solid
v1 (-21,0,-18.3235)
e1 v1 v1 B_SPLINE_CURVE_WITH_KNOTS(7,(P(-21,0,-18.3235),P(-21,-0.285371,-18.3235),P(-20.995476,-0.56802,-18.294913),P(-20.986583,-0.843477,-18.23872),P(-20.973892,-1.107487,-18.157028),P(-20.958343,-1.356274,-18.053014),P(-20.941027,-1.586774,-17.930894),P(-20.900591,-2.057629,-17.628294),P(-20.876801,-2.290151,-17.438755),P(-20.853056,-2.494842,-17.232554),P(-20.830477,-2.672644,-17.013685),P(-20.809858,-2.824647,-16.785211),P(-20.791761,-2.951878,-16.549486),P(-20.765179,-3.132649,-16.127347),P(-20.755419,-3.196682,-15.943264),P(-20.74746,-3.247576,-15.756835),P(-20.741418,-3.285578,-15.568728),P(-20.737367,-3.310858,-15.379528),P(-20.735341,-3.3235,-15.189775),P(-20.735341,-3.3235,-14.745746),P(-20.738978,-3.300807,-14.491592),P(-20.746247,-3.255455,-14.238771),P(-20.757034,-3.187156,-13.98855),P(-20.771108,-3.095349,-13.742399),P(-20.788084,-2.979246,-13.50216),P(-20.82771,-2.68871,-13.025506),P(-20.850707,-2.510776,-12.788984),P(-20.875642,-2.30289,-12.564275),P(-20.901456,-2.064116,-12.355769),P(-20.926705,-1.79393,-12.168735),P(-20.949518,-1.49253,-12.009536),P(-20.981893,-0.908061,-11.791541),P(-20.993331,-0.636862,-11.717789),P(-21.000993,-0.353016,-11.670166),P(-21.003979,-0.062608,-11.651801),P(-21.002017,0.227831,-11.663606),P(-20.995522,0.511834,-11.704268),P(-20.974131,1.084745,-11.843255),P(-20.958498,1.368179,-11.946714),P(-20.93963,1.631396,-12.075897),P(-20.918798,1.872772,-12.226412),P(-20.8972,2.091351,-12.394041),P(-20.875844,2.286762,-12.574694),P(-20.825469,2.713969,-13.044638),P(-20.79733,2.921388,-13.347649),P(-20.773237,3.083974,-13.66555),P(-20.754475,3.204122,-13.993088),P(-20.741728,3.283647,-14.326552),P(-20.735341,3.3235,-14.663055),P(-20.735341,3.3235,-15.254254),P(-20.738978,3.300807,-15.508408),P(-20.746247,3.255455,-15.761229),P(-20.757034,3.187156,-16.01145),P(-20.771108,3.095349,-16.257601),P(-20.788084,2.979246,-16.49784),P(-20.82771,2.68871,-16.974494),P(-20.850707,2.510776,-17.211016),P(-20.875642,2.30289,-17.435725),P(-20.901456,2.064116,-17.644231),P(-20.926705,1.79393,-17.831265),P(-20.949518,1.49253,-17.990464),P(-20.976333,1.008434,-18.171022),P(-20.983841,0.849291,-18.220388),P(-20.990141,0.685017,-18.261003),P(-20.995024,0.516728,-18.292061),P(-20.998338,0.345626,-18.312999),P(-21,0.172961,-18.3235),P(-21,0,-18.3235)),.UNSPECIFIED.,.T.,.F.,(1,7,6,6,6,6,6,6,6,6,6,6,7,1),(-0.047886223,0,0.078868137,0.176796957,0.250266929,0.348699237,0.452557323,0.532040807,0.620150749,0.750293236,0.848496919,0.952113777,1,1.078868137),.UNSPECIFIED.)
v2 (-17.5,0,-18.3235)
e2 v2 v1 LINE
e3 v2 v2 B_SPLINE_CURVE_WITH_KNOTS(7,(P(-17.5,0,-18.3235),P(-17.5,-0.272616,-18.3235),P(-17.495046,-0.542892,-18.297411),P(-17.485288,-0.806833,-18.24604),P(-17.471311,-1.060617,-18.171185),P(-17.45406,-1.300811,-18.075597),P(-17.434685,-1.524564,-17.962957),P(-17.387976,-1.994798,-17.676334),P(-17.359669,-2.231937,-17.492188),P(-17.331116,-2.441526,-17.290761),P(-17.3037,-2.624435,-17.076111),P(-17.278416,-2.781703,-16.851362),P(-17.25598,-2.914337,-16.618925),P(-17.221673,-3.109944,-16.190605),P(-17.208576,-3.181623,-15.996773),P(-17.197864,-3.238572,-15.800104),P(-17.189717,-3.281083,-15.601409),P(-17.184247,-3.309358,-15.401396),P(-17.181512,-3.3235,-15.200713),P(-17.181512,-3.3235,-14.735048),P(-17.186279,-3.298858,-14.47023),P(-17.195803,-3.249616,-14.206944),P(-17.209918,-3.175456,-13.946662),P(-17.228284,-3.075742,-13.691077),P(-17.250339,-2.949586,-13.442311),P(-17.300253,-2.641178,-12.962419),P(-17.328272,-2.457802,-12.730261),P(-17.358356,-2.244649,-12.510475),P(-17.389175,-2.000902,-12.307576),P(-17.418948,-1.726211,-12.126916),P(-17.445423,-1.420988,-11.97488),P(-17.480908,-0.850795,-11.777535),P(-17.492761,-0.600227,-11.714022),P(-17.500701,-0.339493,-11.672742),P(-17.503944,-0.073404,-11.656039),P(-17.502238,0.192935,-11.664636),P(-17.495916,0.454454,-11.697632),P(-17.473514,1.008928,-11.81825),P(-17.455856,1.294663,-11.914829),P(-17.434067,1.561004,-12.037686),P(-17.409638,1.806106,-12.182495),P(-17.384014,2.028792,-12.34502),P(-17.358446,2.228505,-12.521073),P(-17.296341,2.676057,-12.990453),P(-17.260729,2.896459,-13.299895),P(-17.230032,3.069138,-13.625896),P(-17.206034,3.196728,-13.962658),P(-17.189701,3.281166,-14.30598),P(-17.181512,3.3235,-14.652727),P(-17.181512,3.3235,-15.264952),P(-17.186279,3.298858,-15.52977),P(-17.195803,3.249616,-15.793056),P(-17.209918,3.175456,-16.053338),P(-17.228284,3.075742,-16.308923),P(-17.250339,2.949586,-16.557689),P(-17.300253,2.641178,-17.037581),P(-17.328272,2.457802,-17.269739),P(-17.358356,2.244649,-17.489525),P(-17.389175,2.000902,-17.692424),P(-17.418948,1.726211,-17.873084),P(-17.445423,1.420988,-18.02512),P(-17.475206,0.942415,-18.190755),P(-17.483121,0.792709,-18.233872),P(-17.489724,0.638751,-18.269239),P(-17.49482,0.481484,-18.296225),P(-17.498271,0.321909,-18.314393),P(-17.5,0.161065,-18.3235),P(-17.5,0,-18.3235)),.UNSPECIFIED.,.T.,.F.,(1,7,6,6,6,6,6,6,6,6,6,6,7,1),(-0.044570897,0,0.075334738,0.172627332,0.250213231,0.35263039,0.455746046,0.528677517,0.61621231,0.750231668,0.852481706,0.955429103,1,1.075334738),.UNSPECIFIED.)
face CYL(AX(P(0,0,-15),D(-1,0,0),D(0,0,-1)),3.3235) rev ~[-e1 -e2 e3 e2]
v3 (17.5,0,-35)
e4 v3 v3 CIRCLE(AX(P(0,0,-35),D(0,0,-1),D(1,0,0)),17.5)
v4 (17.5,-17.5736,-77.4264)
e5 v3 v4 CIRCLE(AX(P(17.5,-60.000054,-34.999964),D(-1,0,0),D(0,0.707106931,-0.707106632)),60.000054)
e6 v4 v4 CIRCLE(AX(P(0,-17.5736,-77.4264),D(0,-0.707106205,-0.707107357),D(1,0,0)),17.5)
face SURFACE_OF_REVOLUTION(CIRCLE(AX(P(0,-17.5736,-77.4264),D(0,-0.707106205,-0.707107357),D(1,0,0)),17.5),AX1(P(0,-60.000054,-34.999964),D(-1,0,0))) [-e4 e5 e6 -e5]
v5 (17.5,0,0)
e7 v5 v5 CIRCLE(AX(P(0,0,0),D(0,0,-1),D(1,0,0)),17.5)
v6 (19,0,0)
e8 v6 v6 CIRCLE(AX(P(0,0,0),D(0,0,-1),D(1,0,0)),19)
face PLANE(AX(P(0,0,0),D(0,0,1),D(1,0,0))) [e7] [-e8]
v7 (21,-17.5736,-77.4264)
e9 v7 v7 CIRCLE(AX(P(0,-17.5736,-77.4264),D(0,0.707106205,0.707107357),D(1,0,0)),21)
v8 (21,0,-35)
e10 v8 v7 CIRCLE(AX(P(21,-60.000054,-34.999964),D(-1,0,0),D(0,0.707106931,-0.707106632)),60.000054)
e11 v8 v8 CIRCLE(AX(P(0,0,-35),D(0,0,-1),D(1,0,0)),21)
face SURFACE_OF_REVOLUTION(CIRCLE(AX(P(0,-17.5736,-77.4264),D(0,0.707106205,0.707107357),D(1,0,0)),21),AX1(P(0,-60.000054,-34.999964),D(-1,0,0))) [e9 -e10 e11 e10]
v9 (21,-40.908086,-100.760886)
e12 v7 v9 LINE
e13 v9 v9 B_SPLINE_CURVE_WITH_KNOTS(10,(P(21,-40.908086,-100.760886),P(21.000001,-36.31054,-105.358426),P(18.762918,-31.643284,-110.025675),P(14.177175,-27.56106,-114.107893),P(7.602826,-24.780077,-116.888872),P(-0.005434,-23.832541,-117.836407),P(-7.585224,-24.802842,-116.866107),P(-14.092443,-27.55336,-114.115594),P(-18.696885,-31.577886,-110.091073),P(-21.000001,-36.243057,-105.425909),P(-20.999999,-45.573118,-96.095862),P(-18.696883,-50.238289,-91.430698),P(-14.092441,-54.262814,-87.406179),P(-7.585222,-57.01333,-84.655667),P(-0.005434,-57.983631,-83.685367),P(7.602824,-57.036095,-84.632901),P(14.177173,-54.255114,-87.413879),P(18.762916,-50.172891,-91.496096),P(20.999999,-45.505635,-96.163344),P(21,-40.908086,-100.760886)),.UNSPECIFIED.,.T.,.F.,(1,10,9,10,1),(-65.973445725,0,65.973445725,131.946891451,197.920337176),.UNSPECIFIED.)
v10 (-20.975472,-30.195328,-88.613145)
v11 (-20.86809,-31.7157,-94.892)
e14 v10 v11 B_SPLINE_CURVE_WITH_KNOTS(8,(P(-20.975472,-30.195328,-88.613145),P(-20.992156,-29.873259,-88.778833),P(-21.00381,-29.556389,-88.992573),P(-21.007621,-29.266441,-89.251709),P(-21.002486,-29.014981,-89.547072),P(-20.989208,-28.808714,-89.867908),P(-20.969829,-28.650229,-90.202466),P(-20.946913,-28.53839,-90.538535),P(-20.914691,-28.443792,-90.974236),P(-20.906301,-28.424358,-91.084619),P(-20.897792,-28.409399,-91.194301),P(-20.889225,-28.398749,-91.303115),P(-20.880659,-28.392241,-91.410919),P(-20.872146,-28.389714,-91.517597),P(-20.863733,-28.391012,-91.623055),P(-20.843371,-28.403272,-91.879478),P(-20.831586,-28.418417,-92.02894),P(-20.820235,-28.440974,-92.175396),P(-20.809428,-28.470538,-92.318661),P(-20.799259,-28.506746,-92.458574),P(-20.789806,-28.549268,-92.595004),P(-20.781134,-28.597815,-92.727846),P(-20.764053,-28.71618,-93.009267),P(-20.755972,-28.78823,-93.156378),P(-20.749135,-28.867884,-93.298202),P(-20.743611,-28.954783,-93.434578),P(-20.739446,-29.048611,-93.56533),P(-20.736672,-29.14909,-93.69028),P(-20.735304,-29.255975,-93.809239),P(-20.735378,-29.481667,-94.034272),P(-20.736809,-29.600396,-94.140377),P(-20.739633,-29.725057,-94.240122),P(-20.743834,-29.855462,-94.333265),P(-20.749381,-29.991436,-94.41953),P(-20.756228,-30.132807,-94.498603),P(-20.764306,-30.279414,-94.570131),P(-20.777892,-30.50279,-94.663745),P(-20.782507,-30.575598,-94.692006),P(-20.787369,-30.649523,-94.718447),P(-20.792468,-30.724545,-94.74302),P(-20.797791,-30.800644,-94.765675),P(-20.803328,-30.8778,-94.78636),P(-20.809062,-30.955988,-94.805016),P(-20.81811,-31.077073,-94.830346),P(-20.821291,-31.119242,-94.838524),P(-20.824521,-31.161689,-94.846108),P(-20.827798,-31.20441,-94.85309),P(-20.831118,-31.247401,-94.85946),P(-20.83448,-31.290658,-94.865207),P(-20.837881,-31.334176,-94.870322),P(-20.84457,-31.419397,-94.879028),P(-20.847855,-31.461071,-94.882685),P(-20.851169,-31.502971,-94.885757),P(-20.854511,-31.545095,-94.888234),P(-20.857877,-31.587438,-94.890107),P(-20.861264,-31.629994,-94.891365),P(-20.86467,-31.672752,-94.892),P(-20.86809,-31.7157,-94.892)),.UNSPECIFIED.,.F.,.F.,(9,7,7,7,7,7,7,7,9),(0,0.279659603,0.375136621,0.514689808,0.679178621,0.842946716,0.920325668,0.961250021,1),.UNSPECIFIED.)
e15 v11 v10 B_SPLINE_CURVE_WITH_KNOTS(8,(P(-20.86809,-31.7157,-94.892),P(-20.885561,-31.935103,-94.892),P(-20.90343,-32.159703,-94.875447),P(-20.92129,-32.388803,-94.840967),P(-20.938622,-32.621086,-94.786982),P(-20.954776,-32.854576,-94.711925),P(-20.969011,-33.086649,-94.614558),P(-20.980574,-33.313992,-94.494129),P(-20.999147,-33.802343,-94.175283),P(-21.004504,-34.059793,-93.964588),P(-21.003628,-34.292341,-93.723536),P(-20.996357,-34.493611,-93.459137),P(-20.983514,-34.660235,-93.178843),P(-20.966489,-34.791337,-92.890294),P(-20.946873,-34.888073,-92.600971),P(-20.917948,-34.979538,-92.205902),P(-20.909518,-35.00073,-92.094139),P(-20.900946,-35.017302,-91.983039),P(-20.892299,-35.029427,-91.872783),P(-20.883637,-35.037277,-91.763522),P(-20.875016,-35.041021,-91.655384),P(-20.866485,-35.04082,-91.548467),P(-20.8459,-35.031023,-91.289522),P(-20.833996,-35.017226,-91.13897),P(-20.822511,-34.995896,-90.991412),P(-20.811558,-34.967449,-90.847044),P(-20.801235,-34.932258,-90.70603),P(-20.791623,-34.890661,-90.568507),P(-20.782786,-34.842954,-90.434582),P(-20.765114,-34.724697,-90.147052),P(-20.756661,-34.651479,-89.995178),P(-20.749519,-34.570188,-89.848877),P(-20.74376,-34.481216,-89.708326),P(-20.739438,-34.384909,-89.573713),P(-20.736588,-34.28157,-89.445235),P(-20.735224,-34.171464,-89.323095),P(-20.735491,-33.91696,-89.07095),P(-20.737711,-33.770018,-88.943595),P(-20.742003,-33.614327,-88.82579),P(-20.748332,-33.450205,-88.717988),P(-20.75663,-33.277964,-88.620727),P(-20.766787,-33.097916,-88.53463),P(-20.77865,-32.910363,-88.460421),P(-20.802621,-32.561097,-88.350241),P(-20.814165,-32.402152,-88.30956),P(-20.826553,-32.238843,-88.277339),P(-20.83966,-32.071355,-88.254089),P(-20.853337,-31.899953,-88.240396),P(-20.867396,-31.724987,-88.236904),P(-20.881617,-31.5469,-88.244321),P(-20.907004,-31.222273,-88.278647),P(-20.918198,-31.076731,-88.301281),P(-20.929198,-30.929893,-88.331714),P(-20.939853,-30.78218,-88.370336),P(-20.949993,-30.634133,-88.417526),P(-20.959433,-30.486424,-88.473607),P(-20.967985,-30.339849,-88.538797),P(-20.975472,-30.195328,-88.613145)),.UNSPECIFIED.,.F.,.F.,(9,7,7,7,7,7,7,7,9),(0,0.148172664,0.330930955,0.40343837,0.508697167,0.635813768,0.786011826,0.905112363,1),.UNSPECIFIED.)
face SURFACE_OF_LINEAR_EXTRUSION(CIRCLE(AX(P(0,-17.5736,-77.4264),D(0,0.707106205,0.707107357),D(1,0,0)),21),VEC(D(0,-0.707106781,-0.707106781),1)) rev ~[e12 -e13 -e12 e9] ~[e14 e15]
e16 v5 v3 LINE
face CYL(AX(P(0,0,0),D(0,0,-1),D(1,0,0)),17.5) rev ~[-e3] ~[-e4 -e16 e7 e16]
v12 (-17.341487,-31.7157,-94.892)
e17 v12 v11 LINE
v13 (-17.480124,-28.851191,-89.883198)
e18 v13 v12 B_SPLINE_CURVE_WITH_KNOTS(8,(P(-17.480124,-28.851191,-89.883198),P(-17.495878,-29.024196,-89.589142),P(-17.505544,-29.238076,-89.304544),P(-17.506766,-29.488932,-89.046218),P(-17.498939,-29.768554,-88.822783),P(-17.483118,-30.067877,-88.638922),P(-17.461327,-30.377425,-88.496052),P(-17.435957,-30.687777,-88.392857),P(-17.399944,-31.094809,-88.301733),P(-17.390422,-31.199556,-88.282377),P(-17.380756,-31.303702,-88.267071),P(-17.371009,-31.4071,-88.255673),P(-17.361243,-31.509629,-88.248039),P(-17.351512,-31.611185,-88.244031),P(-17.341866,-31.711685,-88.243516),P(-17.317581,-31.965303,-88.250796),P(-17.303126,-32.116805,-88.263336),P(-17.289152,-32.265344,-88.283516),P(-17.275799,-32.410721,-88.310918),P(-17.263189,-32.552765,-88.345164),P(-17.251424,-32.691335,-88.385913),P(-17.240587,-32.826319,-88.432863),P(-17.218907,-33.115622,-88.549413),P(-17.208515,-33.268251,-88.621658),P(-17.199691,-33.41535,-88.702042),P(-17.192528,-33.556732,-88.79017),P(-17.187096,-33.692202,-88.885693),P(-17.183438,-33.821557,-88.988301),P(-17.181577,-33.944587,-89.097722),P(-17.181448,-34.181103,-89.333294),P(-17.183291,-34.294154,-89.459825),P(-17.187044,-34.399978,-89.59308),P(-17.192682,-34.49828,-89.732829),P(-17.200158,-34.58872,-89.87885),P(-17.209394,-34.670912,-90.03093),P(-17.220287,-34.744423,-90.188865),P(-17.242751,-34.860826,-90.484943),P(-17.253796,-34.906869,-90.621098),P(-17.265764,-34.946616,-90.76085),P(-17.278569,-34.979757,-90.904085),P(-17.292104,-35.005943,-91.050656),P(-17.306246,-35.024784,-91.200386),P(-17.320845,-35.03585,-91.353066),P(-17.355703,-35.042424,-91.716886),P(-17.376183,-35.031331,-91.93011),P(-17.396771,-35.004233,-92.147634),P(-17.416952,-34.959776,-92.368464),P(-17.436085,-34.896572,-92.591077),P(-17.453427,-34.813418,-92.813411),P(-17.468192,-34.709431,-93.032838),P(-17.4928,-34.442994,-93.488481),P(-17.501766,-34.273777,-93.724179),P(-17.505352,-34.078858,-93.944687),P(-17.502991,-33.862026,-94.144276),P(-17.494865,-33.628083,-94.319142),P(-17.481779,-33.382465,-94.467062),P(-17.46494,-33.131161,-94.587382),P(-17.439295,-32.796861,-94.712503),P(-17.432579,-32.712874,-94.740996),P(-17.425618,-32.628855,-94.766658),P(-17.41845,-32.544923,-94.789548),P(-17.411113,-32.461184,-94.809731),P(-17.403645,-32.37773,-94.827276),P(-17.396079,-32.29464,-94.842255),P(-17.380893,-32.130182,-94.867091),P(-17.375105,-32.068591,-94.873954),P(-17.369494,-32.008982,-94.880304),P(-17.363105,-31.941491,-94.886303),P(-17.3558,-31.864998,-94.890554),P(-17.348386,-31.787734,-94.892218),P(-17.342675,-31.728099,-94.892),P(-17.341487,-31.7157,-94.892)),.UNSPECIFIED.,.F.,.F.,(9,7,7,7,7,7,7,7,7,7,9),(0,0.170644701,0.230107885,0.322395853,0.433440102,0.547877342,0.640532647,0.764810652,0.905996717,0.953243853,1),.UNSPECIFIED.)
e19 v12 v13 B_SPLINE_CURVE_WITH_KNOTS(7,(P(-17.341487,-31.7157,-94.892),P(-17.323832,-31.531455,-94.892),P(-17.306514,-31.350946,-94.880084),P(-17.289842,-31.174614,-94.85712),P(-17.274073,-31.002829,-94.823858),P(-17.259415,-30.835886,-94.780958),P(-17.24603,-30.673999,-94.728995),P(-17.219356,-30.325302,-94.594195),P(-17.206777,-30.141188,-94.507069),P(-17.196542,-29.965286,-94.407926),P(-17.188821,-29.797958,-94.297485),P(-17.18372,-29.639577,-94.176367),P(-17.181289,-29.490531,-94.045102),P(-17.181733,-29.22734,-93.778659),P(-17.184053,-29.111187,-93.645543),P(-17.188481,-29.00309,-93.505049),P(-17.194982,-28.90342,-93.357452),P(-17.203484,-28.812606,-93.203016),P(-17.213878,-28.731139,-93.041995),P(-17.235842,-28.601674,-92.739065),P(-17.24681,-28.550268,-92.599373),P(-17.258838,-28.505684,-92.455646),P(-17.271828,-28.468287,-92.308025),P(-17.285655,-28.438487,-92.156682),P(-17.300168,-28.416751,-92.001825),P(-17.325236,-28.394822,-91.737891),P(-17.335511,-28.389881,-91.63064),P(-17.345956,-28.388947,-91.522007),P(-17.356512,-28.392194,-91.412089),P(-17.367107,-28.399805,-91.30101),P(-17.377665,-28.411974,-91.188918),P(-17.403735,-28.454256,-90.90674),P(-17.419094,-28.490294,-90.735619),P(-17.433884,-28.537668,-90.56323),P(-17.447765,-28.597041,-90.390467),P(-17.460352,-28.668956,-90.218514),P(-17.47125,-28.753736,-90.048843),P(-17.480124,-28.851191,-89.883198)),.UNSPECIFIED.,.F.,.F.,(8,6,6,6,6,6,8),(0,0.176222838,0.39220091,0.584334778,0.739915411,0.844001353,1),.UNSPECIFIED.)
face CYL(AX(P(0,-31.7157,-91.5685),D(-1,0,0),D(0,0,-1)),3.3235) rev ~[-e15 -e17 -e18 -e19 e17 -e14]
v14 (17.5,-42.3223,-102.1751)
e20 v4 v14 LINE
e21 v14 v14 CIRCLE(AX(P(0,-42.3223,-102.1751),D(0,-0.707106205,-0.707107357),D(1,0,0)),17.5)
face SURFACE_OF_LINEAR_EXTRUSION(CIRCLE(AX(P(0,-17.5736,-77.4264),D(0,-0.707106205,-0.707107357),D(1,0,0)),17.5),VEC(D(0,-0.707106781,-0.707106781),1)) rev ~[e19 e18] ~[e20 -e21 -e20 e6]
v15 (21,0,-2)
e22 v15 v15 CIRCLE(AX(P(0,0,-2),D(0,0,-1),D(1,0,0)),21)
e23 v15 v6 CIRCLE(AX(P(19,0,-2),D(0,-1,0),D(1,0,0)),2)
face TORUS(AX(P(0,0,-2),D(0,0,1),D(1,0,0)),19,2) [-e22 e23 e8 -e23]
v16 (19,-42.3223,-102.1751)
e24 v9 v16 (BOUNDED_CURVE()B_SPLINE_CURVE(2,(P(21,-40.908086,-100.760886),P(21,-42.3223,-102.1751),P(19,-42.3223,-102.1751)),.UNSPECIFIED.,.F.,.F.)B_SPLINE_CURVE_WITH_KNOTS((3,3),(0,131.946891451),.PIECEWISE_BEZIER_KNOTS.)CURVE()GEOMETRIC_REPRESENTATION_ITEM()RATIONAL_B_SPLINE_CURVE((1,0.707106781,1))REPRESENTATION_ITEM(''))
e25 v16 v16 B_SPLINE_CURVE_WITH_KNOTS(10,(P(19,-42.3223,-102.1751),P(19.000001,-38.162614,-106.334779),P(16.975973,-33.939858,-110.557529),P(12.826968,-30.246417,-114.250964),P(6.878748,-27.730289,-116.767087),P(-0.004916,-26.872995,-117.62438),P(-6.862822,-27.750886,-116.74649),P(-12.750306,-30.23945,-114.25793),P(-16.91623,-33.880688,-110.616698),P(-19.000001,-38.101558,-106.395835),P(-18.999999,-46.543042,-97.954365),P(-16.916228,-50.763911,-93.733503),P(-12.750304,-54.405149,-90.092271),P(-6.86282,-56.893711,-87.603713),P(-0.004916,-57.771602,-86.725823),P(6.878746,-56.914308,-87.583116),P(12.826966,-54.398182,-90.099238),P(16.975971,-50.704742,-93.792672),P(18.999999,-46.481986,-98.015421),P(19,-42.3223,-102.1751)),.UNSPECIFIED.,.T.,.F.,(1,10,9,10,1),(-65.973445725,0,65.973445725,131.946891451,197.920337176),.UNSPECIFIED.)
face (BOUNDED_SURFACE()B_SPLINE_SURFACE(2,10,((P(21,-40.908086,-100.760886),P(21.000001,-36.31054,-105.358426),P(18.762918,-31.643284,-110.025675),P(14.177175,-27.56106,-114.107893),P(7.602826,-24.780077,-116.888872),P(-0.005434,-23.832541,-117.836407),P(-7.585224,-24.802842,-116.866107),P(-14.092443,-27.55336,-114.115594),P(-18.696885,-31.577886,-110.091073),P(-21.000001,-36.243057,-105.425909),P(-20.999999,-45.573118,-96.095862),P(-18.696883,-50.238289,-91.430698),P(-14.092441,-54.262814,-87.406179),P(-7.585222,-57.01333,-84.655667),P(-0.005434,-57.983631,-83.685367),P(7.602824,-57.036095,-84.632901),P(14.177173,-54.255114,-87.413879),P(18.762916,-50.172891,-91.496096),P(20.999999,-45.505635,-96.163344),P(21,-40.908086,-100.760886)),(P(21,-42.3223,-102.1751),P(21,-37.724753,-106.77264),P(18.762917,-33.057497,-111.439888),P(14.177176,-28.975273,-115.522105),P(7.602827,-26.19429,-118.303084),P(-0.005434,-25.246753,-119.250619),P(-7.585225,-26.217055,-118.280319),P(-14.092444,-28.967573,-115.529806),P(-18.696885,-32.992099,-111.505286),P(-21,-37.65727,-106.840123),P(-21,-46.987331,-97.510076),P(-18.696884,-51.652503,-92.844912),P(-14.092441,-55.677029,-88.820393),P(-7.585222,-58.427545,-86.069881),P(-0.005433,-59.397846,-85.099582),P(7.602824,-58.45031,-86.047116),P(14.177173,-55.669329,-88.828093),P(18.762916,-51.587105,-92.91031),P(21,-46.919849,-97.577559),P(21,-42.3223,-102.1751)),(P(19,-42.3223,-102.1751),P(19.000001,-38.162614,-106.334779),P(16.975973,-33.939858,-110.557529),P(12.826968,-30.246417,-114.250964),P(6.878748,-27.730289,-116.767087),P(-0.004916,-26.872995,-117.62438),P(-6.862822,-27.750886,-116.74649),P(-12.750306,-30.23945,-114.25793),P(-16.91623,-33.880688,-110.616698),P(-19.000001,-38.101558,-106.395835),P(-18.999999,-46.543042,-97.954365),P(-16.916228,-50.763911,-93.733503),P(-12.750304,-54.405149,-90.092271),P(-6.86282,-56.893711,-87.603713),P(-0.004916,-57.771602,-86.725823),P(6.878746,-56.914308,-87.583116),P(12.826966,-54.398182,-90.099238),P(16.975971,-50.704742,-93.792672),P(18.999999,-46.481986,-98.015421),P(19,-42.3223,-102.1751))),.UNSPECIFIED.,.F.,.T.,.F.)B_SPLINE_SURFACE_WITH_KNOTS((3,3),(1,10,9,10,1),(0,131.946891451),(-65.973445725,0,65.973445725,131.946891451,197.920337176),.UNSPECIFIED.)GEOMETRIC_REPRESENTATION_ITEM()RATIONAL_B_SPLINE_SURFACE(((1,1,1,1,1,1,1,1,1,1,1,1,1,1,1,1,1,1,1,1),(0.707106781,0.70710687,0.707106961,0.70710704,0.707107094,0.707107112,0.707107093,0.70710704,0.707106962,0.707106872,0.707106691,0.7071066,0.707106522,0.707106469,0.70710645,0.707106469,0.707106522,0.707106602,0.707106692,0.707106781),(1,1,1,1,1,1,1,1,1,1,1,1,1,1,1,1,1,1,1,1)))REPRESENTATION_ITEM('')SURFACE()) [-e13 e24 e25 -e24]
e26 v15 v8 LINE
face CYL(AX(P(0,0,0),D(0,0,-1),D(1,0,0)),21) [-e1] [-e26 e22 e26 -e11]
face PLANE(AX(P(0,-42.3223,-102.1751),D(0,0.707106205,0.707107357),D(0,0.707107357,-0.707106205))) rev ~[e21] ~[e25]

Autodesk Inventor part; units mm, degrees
ref_plane "YZ Plane" through (0, 0, 0) normal (1, 0, 0) x (0, 1, 0)
ref_plane "XZ Plane" through (0, 0, 0) normal (0, 1, 0) x (-1, 0, 0)
ref_plane "XY Plane" through (0, 0, 0) normal (0, 0, 1) x (1, 0, 0)
sketch "Sketch3" plane through (0, 0, 0) normal (1, 0, 0) x (0, 1, 0)
  line L0 (0, 0) -> (0, -35)
  line L1 (-17.5736, -77.4264) -> (-42.3223, -102.1751)
  arc A0 (-17.5736, -77.4264) -> (0, -35) centre (-60, -35) ccw
  point P0 (0, -59.8528)
  point P1 (0, -15)
  point P2 (-31.7157, -91.5685)
  dimension "d34" = 59.8528
  dimension "d36" = 135
  dimension "d37" = 60
  dimension "d40" = 15
  dimension "d41" = 15
  dimension "d50" = 35
sketch "Sketch1" plane through (0, 0, 0) normal (0, 0, 1) x (1, 0, 0)
  circle A0 centre (0, 0) radius 17.5
  circle A1 centre (0, 0) radius 21
  dimension "d1" = 42
  dimension "d2" = 35
sweep "Sweep1" add profiles "Sketch1" path "Sketch3"
hole "Hole3" at (0, 0, -15) at (0, -31.7157, -91.5685) direction (-1, 0, 0) diameter 6.647 end through all
fillet "Fillet3" radius 2 2 edges at (-21, 0, 0) (-21, -42.3223, -102.1751)
properties part number "55-6" material "Iron, Cast"
